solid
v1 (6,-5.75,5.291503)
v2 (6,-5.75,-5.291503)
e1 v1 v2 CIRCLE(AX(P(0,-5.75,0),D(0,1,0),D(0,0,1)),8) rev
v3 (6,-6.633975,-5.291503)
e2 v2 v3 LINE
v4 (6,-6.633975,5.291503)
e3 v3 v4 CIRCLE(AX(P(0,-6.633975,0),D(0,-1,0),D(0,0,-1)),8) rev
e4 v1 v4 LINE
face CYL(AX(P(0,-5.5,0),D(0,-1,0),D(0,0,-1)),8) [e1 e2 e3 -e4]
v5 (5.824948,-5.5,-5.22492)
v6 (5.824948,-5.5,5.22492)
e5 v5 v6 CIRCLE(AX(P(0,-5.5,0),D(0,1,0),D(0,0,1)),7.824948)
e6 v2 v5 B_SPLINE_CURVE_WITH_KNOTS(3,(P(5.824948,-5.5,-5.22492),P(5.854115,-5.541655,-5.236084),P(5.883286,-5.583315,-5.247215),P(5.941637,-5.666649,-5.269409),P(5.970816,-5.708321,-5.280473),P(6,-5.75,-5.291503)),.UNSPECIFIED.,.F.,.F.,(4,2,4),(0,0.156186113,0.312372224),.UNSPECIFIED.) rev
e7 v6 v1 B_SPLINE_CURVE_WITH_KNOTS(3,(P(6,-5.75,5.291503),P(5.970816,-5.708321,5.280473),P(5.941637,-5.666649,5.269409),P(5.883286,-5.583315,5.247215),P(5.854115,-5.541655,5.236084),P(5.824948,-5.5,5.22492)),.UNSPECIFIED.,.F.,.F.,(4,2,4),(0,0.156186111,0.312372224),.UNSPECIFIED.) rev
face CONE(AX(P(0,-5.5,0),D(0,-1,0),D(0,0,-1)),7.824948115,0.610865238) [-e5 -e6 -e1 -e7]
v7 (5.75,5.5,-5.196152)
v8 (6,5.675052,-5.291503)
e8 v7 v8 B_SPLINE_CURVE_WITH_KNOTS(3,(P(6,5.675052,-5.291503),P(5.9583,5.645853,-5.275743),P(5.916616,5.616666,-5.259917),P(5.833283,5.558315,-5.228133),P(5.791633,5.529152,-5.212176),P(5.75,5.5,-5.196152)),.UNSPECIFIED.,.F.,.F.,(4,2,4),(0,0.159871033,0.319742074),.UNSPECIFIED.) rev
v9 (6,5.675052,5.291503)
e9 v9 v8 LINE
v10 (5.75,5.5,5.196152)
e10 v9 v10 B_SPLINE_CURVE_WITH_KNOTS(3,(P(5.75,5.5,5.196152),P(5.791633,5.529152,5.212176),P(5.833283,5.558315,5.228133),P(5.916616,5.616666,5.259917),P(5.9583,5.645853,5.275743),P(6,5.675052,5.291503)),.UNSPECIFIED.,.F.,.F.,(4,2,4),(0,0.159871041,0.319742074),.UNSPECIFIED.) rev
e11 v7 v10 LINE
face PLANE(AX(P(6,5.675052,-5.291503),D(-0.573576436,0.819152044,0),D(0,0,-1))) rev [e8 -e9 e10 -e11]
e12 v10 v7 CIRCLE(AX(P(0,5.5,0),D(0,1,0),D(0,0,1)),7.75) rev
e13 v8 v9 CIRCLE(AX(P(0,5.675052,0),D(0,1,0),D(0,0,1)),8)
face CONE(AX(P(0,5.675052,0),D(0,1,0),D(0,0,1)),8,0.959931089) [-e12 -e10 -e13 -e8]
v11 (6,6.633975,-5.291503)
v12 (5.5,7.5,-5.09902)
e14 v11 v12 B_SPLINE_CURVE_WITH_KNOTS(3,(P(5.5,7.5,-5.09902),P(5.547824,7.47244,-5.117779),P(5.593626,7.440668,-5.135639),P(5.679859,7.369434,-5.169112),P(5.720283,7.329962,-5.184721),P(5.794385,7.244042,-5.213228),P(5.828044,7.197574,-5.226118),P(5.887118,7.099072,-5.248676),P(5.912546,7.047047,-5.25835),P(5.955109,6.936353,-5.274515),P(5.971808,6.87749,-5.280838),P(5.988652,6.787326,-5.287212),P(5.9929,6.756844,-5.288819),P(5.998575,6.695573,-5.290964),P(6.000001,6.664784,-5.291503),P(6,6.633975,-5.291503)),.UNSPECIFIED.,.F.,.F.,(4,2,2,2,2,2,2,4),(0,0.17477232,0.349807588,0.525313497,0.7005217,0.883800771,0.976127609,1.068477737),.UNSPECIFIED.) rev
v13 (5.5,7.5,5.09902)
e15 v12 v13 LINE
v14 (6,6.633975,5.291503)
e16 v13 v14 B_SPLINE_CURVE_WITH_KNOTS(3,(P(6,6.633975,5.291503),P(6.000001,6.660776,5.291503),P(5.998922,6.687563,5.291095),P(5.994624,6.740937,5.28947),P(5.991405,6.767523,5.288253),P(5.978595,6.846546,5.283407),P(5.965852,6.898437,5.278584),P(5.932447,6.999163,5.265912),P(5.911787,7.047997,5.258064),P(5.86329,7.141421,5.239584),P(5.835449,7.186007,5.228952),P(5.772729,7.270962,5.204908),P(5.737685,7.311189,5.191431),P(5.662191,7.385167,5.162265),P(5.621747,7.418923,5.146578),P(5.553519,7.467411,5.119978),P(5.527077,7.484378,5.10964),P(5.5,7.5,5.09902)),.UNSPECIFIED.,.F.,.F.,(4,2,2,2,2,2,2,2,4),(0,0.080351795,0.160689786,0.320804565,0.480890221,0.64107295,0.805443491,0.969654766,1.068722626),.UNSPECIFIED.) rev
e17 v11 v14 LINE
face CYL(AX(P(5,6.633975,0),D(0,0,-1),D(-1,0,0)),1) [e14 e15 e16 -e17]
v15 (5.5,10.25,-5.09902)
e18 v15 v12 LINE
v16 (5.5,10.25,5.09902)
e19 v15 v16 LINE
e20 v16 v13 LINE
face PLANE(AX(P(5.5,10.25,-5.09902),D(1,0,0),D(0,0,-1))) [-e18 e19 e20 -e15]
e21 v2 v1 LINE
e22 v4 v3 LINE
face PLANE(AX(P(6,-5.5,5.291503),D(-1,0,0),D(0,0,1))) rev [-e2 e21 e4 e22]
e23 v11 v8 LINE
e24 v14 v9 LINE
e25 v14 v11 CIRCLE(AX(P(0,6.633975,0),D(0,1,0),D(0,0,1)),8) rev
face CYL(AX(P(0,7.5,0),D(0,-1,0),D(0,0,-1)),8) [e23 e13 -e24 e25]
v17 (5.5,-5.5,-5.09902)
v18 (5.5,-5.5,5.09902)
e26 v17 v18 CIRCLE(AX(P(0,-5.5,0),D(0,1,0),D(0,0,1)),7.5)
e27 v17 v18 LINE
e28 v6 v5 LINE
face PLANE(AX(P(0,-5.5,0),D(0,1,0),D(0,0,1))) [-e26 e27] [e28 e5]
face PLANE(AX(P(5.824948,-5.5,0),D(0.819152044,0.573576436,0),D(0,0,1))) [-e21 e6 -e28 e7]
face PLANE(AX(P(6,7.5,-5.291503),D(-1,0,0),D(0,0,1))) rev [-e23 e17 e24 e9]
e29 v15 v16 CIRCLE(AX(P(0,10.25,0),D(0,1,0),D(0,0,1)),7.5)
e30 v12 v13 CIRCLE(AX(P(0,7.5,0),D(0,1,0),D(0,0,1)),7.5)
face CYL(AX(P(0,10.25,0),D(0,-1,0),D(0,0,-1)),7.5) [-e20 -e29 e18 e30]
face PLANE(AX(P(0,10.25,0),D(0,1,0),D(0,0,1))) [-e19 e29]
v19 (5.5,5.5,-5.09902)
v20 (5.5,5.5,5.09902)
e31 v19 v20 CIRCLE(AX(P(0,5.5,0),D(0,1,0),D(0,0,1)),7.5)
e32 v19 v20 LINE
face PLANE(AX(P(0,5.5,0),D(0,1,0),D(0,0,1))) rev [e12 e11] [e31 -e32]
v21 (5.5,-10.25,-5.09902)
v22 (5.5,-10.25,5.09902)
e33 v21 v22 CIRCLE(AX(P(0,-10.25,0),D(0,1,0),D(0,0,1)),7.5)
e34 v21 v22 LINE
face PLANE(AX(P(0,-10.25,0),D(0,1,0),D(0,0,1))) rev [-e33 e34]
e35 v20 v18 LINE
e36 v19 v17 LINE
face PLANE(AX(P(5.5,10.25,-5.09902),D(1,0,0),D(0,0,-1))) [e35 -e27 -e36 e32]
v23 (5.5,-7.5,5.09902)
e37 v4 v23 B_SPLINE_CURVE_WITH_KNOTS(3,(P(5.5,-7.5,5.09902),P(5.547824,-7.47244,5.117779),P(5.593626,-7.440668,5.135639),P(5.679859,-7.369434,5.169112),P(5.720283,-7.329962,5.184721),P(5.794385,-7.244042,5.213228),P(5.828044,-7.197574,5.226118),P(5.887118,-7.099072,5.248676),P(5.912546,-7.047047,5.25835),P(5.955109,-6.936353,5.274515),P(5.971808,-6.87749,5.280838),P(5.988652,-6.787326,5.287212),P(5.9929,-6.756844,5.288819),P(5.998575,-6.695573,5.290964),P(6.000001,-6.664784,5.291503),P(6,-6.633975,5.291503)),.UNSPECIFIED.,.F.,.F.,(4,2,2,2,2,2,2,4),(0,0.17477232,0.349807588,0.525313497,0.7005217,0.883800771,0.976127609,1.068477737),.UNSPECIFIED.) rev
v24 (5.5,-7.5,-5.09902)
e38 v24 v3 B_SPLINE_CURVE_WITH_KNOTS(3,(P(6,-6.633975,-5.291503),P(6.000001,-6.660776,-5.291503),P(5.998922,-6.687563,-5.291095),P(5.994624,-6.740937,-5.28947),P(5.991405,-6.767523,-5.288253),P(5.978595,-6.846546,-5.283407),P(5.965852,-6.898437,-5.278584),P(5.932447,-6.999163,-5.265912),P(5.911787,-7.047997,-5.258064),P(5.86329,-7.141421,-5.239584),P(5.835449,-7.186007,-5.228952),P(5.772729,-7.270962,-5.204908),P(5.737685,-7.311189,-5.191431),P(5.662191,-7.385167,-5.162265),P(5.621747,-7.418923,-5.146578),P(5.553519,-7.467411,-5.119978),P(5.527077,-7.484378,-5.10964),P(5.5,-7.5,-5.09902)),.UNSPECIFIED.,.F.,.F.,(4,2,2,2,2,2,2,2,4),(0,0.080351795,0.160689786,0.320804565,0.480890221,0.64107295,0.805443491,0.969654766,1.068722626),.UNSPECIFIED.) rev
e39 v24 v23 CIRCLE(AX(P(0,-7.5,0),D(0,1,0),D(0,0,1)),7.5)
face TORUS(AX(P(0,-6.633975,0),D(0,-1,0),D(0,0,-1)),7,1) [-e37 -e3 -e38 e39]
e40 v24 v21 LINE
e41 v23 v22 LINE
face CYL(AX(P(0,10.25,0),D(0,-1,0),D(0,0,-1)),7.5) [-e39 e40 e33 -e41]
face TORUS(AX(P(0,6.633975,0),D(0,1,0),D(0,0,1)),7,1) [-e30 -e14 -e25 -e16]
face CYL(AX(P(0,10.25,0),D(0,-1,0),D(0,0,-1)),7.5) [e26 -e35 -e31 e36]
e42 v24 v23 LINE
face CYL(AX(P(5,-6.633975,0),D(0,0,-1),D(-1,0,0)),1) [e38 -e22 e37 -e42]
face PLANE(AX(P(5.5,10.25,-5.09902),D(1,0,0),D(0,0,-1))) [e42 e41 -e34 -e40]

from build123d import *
from OCP.BRepFilletAPI import BRepFilletAPI_MakeChamfer

# Parameters (mm, degrees)
BOSS_EXTRUDE1_DEPTH = 10.25
BOSS_EXTRUDE2_DEPTH = 1
BOSS_EXTRUDE3_DEPTH = 1
FILLET1_R           = 1
CHAMFER1_SIZE       = 0.25
CHAMFER1_SIZE2      = 0.175051885


with BuildPart() as part:
    # Sketch1 → Boss-Extrude1 (new, symmetric)
    with BuildSketch(Plane(origin=(0, 0, 0), x_dir=(1, 0, 0), z_dir=(0, 1, 0))):
        with BuildLine():
            Line((5.5, 5.099019514), (5.5, -5.099019514))
            ThreePointArc((5.5, -5.099019514), (-7.5, 0), (5.5, 5.099019514))
        make_face()
    extrude(amount=BOSS_EXTRUDE1_DEPTH, both=True)

    # Sketch2 → Boss-Extrude2 (add, symmetric)
    with BuildSketch(Plane(origin=(0, 6.5, 0), x_dir=(1, 0, 0), z_dir=(0, 1, 0))):
        with BuildLine():
            Line((6, 5.291502622), (6, -5.291502622))
            ThreePointArc((6, -5.291502622), (-8, 0), (6, 5.291502622))
        make_face()
    extrude(amount=BOSS_EXTRUDE2_DEPTH, both=True)

    # Sketch3 → Boss-Extrude3 (add, symmetric)
    with BuildSketch(Plane(origin=(0, -6.5, 0), x_dir=(1, 0, 0), z_dir=(0, 1, 0))):
        with BuildLine():
            Line((6, -5.291502622), (6, 5.291502622))
            ThreePointArc((6, 5.291502622), (-8, 0), (6, -5.291502622))
        make_face()
    extrude(amount=BOSS_EXTRUDE3_DEPTH, both=True)

    # Fillet1
    # the kernel refuses this fillet: 1 mm, written as the material it takes off along each edge
    with BuildSketch(Plane(origin=(0, 7.5, 0), x_dir=(0.8999821902414007, 0, 0.43592666498883875), z_dir=(0.43592666498883875, 0, -0.8999821902414007))) as fillet1_piece_1:
        with BuildLine():
            CenterArc((7, 0.866025404), FILLET1_R, 300, 60)
            Line((7.5, 0), (7.51, -0.017320508))
            ThreePointArc((7.51, -0.017320508), (7.75, -0.02), (8, -0.02))
            Line((8, -0.02), (8.02, 0))
            Line((8.02, 0), (8.02, 0.866025404))
            Line((8.02, 0.866025404), (8, 0.866025404))
        make_face()
    revolve(axis=Axis((0, 7.5, 0), (0, -1, 0)), revolution_arc=308.311452645, mode=Mode.SUBTRACT)
    with BuildSketch(Plane(origin=(6, 7.5, -7.456566132), x_dir=(0, -1, 0), z_dir=(0, 0, 1))) as fillet1_piece_2:
        with BuildLine():
            CenterArc((0.866025404, -1), FILLET1_R, 90, 60)
            Line((0, -0.5), (-0.017320508, -0.49))
            ThreePointArc((-0.017320508, -0.49), (-0.02, -0.25), (-0.02, 0))
            Line((-0.02, 0), (0, 0.02))
            Line((0, 0.02), (0.866025404, 0.02))
            Line((0.866025404, 0.02), (0.866025404, 0))
        make_face()
    extrude(amount=14.913132263, mode=Mode.SUBTRACT)
    with BuildSketch(Plane(origin=(6, -7.5, 7.456566132), x_dir=(-1, 0, 0), z_dir=(0, 0, -1))) as fillet1_piece_3:
        with BuildLine():
            CenterArc((1, 0.866025404), FILLET1_R, 180, 60)
            Line((0, 0.866025404), (-0.02, 0.866025404))
            Line((-0.02, 0.866025404), (-0.02, 0))
            Line((-0.02, 0), (0, -0.02))
            ThreePointArc((0, -0.02), (0.25, -0.02), (0.49, -0.017320508))
            Line((0.49, -0.017320508), (0.5, 0))
        make_face()
    extrude(amount=14.913132263, mode=Mode.SUBTRACT)
    with BuildSketch(Plane(origin=(0, -7.5, 0), x_dir=(0.8999821902414012, 0, -0.4359266649888379), z_dir=(0.4359266649888379, 0, 0.8999821902414012))) as fillet1_piece_4:
        with BuildLine():
            CenterArc((7, 0.866025404), FILLET1_R, 300, 60)
            Line((8, 0.866025404), (8.02, 0.866025404))
            Line((8.02, 0.866025404), (8.02, 0))
            Line((8.02, 0), (8, -0.02))
            ThreePointArc((8, -0.02), (7.75, -0.02), (7.51, -0.017320508))
            Line((7.51, -0.017320508), (7.5, 0))
        make_face()
    revolve(axis=Axis((0, -7.5, 0), (0, 1, 0)), revolution_arc=308.311452645, mode=Mode.SUBTRACT)

    # Chamfer1: one chamfer whose edges measure the first distance from different faces: ONE call of the kernel's chamfer builder (chamfer() names one face for all edges)
    chamfer1_edges_1 = [part.edges().sort_by_distance(p)[0] for p in [
        (-8, 5.5, 0),
        (6, 5.5, 0),
    ]]
    chamfer1_side_1 = [part.faces().sort_by_distance(p)[0] for p in [
        (5.787397084, 5.5, 0),
    ]]
    chamfer1_edges_2 = [part.edges().sort_by_distance(p)[0] for p in [
        (6, -5.5, 0),
    ]]
    chamfer1_side_2 = [part.faces().sort_by_distance(p)[0] for p in [
        (6, -6.066987298, 0),
    ]]
    chamfer1_edges_3 = [part.edges().sort_by_distance(p)[0] for p in [
        (-8, -5.5, 0),
    ]]
    chamfer1_side_3 = [part.faces().sort_by_distance(p)[0] for p in [
        (-8, -6.066987298, 0),
    ]]
    chamfer1 = BRepFilletAPI_MakeChamfer(part.part.solid().wrapped)
    for e in chamfer1_edges_1:
        chamfer1.Add(CHAMFER1_SIZE, CHAMFER1_SIZE2, e.wrapped, chamfer1_side_1[0].wrapped)  # the first distance lies on this face
    for e in chamfer1_edges_2:
        chamfer1.Add(CHAMFER1_SIZE, CHAMFER1_SIZE2, e.wrapped, chamfer1_side_2[0].wrapped)  # the first distance lies on this face
    for e in chamfer1_edges_3:
        chamfer1.Add(CHAMFER1_SIZE, CHAMFER1_SIZE2, e.wrapped, chamfer1_side_3[0].wrapped)  # the first distance lies on this face
    add(Compound.cast(chamfer1.Shape()), mode=Mode.REPLACE)


solid = part.part
